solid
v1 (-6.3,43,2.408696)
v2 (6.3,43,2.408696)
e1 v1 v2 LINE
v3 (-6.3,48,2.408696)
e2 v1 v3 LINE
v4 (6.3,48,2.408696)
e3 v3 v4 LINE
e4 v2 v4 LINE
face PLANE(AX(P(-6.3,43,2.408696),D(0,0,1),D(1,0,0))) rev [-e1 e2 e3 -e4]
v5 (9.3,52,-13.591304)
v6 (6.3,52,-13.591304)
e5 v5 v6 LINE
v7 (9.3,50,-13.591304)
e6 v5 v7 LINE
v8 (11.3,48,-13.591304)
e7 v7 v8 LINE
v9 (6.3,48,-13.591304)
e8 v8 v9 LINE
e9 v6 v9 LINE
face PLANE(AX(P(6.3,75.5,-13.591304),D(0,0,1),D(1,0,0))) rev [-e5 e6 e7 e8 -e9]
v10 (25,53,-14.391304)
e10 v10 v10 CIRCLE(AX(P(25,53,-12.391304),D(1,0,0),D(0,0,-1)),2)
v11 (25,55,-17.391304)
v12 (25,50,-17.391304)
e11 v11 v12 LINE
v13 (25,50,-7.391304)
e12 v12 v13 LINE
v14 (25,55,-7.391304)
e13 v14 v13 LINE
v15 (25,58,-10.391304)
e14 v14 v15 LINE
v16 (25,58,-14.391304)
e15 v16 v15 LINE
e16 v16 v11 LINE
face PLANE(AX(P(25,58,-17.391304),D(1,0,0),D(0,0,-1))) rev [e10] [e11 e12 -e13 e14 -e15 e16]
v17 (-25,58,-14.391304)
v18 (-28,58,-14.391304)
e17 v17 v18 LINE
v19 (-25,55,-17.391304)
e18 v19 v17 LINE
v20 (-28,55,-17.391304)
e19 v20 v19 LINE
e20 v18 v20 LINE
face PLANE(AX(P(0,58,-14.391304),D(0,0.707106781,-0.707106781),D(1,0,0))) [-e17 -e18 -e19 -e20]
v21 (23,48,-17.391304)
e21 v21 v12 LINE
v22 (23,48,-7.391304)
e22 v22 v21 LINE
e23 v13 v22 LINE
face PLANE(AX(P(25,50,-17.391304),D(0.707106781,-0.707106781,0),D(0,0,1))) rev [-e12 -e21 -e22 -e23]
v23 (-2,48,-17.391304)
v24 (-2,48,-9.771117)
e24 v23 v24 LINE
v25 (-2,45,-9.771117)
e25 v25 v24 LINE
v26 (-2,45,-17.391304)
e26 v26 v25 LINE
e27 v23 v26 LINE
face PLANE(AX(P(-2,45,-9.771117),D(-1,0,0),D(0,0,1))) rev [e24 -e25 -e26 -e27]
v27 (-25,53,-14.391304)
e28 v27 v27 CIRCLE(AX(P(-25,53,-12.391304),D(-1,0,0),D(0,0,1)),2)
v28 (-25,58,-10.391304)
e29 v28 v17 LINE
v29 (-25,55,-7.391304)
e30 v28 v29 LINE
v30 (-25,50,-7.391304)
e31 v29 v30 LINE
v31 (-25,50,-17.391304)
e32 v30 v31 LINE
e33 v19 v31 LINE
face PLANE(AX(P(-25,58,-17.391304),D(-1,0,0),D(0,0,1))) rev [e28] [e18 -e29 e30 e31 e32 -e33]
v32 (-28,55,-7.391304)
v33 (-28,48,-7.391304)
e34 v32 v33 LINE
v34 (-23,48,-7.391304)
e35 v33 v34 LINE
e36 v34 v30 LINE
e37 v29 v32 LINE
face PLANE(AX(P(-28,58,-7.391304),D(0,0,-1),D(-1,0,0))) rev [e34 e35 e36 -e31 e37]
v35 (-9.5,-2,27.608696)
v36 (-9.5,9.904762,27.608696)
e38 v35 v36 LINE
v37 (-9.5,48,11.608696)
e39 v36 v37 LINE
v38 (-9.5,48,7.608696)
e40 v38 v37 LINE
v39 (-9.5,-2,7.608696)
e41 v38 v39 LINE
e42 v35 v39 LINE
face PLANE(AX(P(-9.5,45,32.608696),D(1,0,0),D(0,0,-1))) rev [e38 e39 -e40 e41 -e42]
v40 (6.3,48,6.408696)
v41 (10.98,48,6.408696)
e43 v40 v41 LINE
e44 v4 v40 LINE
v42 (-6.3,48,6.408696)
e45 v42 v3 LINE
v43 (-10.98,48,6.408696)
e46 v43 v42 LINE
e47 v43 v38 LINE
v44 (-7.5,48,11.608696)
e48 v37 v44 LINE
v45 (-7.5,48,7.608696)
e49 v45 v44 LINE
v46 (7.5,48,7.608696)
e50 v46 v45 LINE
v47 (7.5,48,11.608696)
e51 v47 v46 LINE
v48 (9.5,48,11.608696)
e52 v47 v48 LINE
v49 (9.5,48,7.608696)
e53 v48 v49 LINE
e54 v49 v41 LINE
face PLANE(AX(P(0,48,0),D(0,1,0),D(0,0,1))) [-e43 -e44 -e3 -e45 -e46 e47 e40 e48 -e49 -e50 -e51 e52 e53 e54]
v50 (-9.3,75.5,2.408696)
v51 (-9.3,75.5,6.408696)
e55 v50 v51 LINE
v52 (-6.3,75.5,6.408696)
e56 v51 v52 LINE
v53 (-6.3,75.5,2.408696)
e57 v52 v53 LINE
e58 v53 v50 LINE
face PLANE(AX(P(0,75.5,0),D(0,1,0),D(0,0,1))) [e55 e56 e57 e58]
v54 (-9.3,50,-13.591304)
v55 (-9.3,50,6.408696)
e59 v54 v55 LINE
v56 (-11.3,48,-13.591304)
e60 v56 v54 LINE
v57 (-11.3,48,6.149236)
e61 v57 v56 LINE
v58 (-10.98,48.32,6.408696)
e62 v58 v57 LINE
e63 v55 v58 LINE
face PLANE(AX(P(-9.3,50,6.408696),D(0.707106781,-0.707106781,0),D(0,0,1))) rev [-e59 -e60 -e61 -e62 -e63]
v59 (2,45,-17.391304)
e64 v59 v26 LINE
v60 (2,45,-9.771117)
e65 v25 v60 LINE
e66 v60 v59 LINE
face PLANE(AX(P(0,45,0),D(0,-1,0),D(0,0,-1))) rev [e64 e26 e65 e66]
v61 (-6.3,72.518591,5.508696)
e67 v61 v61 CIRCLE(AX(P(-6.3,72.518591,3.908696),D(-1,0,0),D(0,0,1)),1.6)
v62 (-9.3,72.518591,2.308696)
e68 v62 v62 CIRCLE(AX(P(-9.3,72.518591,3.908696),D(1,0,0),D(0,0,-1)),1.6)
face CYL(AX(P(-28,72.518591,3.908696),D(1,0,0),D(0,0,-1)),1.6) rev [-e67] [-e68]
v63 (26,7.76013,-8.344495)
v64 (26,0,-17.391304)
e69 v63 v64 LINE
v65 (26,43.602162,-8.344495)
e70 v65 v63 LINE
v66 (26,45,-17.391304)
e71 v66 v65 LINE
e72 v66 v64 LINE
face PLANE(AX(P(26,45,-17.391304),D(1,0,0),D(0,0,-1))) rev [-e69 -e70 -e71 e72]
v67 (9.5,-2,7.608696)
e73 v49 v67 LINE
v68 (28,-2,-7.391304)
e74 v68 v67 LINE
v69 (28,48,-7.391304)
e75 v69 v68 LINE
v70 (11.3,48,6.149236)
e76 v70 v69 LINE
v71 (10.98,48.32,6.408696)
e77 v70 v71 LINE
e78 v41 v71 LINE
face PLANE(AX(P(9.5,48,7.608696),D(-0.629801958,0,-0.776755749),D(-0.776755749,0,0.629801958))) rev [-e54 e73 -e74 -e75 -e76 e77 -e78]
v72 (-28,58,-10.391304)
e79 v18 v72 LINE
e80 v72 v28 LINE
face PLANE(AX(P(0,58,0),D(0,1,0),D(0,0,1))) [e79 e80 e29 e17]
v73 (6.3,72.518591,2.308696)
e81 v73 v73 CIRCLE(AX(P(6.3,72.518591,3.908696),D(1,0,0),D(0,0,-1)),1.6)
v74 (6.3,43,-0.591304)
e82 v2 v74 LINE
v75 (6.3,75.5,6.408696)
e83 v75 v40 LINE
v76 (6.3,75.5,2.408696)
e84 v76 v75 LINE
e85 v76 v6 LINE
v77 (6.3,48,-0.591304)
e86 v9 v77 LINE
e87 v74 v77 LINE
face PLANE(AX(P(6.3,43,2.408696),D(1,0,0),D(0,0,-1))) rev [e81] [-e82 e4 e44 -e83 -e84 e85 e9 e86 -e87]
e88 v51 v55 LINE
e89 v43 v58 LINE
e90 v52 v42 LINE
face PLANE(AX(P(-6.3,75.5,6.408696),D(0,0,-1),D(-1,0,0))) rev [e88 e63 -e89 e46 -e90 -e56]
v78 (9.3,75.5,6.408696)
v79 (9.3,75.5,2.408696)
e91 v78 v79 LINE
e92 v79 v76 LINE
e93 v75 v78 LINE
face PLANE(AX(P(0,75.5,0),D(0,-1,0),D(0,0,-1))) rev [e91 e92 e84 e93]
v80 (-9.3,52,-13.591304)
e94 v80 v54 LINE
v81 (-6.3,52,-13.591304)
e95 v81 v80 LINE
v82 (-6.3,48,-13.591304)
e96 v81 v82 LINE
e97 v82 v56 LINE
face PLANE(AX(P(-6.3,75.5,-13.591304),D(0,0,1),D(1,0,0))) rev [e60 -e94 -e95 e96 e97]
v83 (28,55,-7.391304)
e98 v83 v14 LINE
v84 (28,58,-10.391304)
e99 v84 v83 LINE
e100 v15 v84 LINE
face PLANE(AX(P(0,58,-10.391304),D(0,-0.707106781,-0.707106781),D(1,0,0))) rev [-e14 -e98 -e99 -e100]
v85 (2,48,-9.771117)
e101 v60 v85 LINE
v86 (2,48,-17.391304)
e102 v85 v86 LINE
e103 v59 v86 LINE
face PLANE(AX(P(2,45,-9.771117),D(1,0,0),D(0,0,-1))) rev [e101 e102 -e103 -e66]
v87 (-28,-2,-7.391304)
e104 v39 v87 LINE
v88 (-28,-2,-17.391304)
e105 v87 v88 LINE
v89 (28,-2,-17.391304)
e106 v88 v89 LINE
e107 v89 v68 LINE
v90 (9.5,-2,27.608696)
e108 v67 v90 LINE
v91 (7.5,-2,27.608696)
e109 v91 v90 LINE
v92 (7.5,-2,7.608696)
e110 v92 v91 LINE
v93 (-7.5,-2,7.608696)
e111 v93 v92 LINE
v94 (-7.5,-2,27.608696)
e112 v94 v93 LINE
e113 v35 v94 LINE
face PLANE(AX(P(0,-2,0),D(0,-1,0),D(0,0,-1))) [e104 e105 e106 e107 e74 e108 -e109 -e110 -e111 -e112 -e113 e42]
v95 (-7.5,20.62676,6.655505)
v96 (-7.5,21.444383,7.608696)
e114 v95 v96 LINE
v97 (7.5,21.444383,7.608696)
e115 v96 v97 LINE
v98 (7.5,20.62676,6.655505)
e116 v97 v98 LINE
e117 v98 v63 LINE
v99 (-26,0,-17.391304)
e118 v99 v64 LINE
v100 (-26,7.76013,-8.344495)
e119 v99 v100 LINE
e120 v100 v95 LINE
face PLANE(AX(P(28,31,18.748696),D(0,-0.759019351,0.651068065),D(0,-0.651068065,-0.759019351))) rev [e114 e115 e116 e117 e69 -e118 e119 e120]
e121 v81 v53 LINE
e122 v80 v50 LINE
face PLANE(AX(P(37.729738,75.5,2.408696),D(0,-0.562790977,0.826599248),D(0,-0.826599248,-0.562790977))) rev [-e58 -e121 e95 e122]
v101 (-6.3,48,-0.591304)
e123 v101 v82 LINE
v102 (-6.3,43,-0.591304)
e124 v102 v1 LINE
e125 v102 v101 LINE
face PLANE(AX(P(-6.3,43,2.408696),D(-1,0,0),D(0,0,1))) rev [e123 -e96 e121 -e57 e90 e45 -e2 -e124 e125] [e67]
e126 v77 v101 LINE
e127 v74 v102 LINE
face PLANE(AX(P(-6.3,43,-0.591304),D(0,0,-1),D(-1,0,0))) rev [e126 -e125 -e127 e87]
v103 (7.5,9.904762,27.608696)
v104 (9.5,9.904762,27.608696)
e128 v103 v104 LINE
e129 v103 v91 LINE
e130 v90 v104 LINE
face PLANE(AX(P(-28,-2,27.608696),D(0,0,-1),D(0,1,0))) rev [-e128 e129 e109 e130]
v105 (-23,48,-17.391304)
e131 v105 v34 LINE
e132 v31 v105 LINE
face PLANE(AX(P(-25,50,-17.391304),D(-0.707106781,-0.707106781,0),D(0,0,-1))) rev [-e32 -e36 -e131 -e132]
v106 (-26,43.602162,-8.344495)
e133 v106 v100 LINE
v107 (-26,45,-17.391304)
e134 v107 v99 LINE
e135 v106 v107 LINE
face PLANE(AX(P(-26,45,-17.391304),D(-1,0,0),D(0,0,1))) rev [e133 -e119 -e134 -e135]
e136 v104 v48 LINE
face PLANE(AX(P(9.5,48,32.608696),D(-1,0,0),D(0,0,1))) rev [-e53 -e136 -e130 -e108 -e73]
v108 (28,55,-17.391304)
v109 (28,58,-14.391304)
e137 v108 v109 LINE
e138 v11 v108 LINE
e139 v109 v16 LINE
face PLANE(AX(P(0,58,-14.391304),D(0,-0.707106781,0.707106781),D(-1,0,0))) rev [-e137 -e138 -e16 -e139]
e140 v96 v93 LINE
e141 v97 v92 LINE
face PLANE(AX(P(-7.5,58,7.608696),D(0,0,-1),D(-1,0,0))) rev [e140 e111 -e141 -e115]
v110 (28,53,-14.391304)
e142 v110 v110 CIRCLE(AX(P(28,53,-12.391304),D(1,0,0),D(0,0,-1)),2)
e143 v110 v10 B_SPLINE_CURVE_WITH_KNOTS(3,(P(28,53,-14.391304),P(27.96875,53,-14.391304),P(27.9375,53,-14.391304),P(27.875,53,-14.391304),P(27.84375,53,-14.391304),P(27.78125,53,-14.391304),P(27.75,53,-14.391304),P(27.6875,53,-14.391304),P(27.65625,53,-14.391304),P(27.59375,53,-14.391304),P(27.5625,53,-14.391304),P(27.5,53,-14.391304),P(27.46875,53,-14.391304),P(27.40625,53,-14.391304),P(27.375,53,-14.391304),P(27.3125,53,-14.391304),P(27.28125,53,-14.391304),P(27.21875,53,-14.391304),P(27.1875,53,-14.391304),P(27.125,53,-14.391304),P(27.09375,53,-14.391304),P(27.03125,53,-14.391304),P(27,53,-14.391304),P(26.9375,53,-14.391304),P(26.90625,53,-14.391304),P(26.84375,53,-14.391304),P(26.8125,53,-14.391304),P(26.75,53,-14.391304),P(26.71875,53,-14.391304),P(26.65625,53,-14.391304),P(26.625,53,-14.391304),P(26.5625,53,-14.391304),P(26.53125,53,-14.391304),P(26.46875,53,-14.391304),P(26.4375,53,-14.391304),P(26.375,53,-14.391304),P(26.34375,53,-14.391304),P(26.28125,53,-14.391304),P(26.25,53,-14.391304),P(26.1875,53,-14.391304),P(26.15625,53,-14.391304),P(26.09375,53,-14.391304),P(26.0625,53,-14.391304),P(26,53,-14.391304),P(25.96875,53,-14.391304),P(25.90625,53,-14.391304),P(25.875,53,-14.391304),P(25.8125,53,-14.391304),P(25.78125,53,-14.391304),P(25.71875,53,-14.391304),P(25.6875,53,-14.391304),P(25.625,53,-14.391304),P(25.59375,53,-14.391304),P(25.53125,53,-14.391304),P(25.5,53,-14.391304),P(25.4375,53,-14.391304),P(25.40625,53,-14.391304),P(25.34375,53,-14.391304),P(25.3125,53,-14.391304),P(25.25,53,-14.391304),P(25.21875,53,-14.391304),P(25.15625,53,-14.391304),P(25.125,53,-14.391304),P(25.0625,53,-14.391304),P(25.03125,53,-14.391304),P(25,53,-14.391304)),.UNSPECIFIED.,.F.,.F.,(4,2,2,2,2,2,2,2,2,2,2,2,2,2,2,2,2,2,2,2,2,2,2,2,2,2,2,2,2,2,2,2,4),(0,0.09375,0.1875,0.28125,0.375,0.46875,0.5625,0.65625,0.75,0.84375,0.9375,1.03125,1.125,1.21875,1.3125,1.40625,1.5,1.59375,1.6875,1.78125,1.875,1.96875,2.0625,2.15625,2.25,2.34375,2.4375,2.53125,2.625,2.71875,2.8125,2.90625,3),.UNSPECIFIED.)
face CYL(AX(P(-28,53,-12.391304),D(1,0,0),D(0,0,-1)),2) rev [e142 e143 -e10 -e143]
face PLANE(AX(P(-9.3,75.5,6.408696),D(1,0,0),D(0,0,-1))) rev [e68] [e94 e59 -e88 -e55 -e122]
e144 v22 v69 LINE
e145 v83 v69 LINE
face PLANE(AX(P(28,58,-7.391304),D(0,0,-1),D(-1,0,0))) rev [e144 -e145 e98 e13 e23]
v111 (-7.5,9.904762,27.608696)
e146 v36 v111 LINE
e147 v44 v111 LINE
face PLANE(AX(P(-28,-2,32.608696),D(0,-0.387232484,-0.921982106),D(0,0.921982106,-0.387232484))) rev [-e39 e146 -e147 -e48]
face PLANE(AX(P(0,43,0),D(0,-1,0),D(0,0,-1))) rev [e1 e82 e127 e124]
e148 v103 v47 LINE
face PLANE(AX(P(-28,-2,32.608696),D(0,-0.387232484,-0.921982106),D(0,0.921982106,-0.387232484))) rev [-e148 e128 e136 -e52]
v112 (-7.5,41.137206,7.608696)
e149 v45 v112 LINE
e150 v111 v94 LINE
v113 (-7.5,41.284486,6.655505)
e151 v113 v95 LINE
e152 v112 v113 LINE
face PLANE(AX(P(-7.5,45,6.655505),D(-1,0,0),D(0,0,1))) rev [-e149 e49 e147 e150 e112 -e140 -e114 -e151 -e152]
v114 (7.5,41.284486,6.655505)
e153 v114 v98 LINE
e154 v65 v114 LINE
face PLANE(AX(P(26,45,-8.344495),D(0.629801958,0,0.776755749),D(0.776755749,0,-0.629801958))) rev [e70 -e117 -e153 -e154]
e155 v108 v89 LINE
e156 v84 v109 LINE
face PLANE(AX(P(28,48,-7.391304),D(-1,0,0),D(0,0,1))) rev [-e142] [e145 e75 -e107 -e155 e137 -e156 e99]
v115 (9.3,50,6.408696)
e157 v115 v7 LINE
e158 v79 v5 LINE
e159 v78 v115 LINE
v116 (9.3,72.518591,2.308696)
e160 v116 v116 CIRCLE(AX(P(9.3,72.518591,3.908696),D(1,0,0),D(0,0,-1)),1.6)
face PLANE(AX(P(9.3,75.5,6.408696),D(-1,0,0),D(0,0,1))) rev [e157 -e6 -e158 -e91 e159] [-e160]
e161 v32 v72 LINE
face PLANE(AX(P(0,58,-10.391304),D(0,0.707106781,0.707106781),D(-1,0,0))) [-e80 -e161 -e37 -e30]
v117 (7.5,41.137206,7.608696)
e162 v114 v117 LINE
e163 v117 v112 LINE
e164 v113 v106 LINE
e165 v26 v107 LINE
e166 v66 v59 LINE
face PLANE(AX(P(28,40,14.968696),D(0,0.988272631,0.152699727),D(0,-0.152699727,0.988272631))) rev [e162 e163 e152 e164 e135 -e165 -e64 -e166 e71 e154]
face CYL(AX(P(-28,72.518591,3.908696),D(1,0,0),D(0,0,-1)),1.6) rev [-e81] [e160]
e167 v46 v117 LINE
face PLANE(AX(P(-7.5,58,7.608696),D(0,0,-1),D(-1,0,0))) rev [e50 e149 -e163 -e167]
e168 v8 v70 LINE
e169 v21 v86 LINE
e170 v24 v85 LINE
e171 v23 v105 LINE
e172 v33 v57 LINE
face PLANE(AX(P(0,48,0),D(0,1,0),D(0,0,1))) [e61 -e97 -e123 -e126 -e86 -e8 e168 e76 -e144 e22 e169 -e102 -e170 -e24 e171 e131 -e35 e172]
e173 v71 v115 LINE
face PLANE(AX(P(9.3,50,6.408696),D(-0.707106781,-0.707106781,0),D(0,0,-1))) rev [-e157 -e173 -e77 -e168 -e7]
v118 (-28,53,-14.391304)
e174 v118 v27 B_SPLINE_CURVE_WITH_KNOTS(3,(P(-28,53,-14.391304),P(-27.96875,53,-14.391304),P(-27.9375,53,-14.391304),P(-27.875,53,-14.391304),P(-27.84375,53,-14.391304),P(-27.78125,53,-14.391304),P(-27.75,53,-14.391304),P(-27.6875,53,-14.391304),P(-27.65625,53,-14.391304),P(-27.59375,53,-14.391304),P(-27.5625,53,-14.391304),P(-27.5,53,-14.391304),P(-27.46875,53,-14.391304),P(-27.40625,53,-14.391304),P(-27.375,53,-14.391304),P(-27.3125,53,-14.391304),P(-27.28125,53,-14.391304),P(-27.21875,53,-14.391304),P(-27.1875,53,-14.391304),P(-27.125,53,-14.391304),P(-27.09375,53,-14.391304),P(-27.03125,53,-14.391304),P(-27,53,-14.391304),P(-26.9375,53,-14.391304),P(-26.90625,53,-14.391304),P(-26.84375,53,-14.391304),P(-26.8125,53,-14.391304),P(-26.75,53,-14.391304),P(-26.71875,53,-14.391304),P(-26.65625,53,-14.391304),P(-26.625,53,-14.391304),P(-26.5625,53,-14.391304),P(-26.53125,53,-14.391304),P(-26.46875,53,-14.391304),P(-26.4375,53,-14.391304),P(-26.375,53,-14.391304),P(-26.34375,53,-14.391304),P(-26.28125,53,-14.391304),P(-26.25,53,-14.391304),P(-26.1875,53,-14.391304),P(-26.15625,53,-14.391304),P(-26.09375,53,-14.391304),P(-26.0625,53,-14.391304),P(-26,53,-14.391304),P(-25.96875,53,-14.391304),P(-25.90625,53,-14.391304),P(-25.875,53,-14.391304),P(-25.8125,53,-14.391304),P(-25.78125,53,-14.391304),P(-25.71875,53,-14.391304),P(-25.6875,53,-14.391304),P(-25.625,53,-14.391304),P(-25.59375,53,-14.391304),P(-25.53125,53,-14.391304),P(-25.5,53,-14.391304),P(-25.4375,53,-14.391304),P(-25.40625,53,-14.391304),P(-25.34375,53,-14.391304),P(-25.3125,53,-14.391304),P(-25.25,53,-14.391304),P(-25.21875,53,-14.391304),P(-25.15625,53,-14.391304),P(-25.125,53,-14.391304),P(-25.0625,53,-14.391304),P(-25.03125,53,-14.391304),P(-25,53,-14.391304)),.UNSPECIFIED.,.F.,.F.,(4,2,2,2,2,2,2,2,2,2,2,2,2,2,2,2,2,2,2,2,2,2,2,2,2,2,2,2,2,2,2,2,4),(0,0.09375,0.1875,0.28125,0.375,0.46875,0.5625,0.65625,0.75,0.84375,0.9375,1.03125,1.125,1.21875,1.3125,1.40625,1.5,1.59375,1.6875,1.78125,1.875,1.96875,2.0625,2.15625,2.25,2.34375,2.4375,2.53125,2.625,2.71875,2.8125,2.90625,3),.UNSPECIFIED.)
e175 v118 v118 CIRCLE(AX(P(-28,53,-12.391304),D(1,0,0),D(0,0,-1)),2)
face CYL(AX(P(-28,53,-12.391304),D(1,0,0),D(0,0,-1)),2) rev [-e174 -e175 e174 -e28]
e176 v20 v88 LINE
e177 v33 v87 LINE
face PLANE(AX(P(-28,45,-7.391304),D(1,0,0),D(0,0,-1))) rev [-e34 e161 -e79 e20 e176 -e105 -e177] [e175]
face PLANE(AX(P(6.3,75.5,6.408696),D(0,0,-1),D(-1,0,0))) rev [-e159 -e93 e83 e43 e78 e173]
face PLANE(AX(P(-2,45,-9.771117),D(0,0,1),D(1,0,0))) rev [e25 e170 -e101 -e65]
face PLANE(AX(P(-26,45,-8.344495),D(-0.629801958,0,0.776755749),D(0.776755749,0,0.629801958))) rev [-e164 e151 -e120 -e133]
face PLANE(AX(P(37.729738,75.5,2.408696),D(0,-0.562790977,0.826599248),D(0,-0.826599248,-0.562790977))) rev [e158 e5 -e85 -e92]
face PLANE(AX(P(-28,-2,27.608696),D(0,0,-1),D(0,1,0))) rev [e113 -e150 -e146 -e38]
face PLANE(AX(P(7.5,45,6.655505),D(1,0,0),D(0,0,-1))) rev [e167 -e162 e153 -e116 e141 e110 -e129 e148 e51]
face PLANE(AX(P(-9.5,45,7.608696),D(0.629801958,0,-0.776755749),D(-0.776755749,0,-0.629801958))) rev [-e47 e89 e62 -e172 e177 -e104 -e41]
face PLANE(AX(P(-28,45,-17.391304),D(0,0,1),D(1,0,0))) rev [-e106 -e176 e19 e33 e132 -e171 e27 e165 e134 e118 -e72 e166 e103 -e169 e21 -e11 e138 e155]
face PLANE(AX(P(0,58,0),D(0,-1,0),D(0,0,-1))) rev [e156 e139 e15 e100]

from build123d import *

# Parameters (mm, degrees)
SALIENTE_EXTRUIR1_DEPTH   = 45
SALIENTE_EXTRUIR1_2_DEPTH = 45
SALIENTE_EXTRUIR2_DEPTH   = 3
SALIENTE_EXTRUIR3_START   = -45
SALIENTE_EXTRUIR3_DEPTH   = 2
CROQUIS4_W                = 3
CROQUIS4_H                = 10
SALIENTE_EXTRUIR4_DEPTH   = 10
CROQUIS5_R                = 2
CORTAR_EXTRUIR1_DEPTH     = 87.967390625
CHAFL_N1_SIZE             = 3
CORTAR_EXTRUIR3_DEPTH     = 77.377856949
SALIENTE_EXTRUIR7_DEPTH   = 54
CROQUIS6_W                = 15
CROQUIS6_H                = 20
CORTAR_EXTRUIR5_DEPTH     = 74.806009458
CORTAR_EXTRUIR6_DEPTH     = 74.806009458
CORTAR_EXTRUIR7_DEPTH     = 77.377856949
CROQUIS16_W               = 12.6
CROQUIS16_H               = 3
CORTAR_EXTRUIR8_DEPTH     = 5
CROQUIS18_W               = 3
CROQUIS18_H               = 20
SALIENTE_EXTRUIR8_DEPTH   = 27.5
CORTAR_EXTRUIR9_REACH     = 90.622
CROQUIS21_W               = 4
CROQUIS21_H               = 10
CORTAR_EXTRUIR10_DEPTH    = 3
CROQUIS22_R               = 1.6
CORTAR_EXTRUIR11_DEPTH    = 89.621555367
CHAFL_N2_SIZE             = 2


with BuildPart() as part:
    # Croquis1 → Saliente-Extruir1 (new body)
    with BuildSketch(Plane(origin=(0, 0, 0), x_dir=(1, 0, 0), z_dir=(0, 1, 0))):
        Polygon((-26, 17.391304348), (-26, 8.344494697), (-7.5, -6.655505303), (-7.5, -32.608695652), (-9.5, -32.608695652), (-9.5, -7.608695652), (-28, 7.391304348), (-28, 17.391304348), align=None)
    extrude(amount=SALIENTE_EXTRUIR1_DEPTH)



with BuildPart() as body_2:
    # Croquis1 → Saliente-Extruir1 2 (new body)
    with BuildSketch(Plane(origin=(0, 0, 0), x_dir=(1, 0, 0), z_dir=(0, 1, 0))):
        Polygon((7.5, -6.655505303), (7.5, -32.608695652), (9.5, -32.608695652), (9.5, -7.608695652), (28, 7.391304348), (28, 17.391304348), (26, 17.391304348), (26, 8.344494697), align=None)
    extrude(amount=SALIENTE_EXTRUIR1_2_DEPTH)


with BuildPart() as part_1:
    add(part.part)

    add(body_2.part)  # Saliente-Extruir2 merges body 2
    # Croquis2 → Saliente-Extruir2 (add)
    with BuildSketch(Plane(origin=(0, 45, 0), x_dir=(1, 0, 0), z_dir=(0, 1, 0))):
        Polygon((-9.5, -32.608695652), (9.5, -32.608695652), (9.5, -7.608695652), (28, 7.391304348), (28, 17.391304348), (-28, 17.391304348), (-28, 7.391304348), (-9.5, -7.608695652), align=None)
    extrude(amount=SALIENTE_EXTRUIR2_DEPTH)

    # Croquis2<2> → Saliente-Extruir3 (add)
    with BuildSketch(Plane(origin=(0, 45, 0), x_dir=(1, 0, 0), z_dir=(0, 1, 0)).offset(SALIENTE_EXTRUIR3_START)):
        Polygon((-9.5, -32.608695652), (9.5, -32.608695652), (9.5, -7.608695652), (28, 7.391304348), (28, 17.391304348), (-28, 17.391304348), (-28, 7.391304348), (-9.5, -7.608695652), align=None)
    extrude(amount=-SALIENTE_EXTRUIR3_DEPTH)

    # Croquis4 → Saliente-Extruir4 (add)
    with BuildSketch(Plane(origin=(0, 48, 0), x_dir=(1, 0, 0), z_dir=(0, 1, 0))):
        with Locations((-26.5, 12.391304348)):
            Rectangle(CROQUIS4_W, CROQUIS4_H)
        with Locations((26.5, 12.391304348)):
            Rectangle(CROQUIS4_W, CROQUIS4_H)
    extrude(amount=SALIENTE_EXTRUIR4_DEPTH)

    # Croquis5 → Cortar-Extruir1 (cut, through all)
    with BuildSketch(Plane(origin=(28, 0, 0), x_dir=(0, 0, -1), z_dir=(1, 0, 0))):
        with Locations((12.391304348, 53)):
            Circle(CROQUIS5_R)
    extrude(amount=-CORTAR_EXTRUIR1_DEPTH, mode=Mode.SUBTRACT)

    # Chaflán1
    chafl_n1_edges = [part_1.edges().sort_by_distance(p)[0] for p in [
        (-26.5, 58, -7.391304348),
        (-26.5, 58, -17.391304348),
        (26.5, 58, -17.391304348),
        (26.5, 58, -7.391304348),
    ]]
    chamfer(chafl_n1_edges, length=CHAFL_N1_SIZE)

    # Croquis7 → Cortar-Extruir3 (cut, through all)
    with BuildSketch(Plane(origin=(9.5, 0, 0), x_dir=(0, 0, -1), z_dir=(1, 0, 0))):
        Polygon((-32.608695652, -2), (-11.608695652, 48), (-32.608695652, 48), align=None)
    extrude(amount=-CORTAR_EXTRUIR3_DEPTH, mode=Mode.SUBTRACT)

    # Croquis13 → Saliente-Extruir7 (add)
    with BuildSketch(Plane(origin=(-26, 0, 0), x_dir=(0, 0, -1), z_dir=(1, 0, 0))):
        Polygon((17.391304348, 45), (-12.868695652, 45), (-14.968695652, 40), align=None)
        Polygon((17.391304348, 0), (-31.768695652, 0), (-18.748695652, 31), align=None)
    extrude(amount=SALIENTE_EXTRUIR7_DEPTH)

    # Croquis6 → Cortar-Extruir5 (cut, through all)
    with BuildSketch(Plane.XZ.offset(2)):
        with Locations((0, 17.608695652)):
            Rectangle(CROQUIS6_W, CROQUIS6_H)
    extrude(amount=-CORTAR_EXTRUIR5_DEPTH, mode=Mode.SUBTRACT)

    # Croquis14 → Cortar-Extruir6 (cut, through all)
    with BuildSketch(Plane.XZ.offset(2)):
        Polygon((-28, -7.391304348), (-9.5, 7.608695652), (-9.5, 32.608695652), (-28, 32.608695652), align=None)
        Polygon((28, -7.391304348), (9.5, 7.608695652), (9.5, 32.608695652), (28, 32.608695652), align=None)
    extrude(amount=-CORTAR_EXTRUIR6_DEPTH, mode=Mode.SUBTRACT)

    # Croquis15 → Cortar-Extruir7 (cut, through all)
    with BuildSketch(Plane(origin=(9.5, 0, 0), x_dir=(0, 0, -1), z_dir=(1, 0, 0))):
        Polygon((-27.608695652, -2), (-27.608695652, 9.904761905), (-32.608695652, -2), align=None)
    extrude(amount=-CORTAR_EXTRUIR7_DEPTH, mode=Mode.SUBTRACT)

    # Croquis16 → Cortar-Extruir8 (cut)
    with BuildSketch(Plane(origin=(0, 48, 0), x_dir=(1, 0, 0), z_dir=(0, 1, 0))):
        with Locations((0, -0.908695652)):
            Rectangle(CROQUIS16_W, CROQUIS16_H)
    extrude(amount=-CORTAR_EXTRUIR8_DEPTH, mode=Mode.SUBTRACT)

    # Croquis18 → Saliente-Extruir8 (add)
    with BuildSketch(Plane(origin=(0, 48, 0), x_dir=(1, 0, 0), z_dir=(0, 1, 0))):
        with Locations((-7.8, 3.591304348)):
            Rectangle(CROQUIS18_W, CROQUIS18_H)
        with Locations((7.8, 3.591304348)):
            Rectangle(CROQUIS18_W, CROQUIS18_H)
    extrude(amount=SALIENTE_EXTRUIR8_DEPTH)

    # Cortar-Extruir9: up to this face of the body (flat: up to its plane)
    cortar_extruir9_end = Plane(part_1.part.faces().sort_by_distance((9.3, 61.75, -3.591304348))[0])
    # Croquis20 → Cortar-Extruir9 (cut, up to the picked face)
    with BuildSketch(Plane.ZY.offset(9.3), mode=Mode.PRIVATE) as cortar_extruir9_sk1:
        Polygon((2.408695652, 75.5), (-13.591304348, 52), (-13.591304348, 75.5), align=None)
    cortar_extruir9_tool1 = split(extrude(cortar_extruir9_sk1.sketch, amount=-CORTAR_EXTRUIR9_REACH, mode=Mode.PRIVATE), bisect_by=cortar_extruir9_end, keep=Keep.BOTH, mode=Mode.PRIVATE)
    add(cortar_extruir9_tool1.solids().sort_by(Axis((-9.3, 67.666667, -8.257971), (1, 0, 0)))[0], mode=Mode.SUBTRACT)

    # Croquis21 → Cortar-Extruir10 (cut)
    with BuildSketch(Plane(origin=(0, 48, 0), x_dir=(1, 0, 0), z_dir=(0, 1, 0))):
        with Locations((0, 14.771116856)):
            Rectangle(CROQUIS21_W, CROQUIS21_H)
    extrude(amount=-CORTAR_EXTRUIR10_DEPTH, mode=Mode.SUBTRACT)

    # Croquis22 → Cortar-Extruir11 (cut, through all)
    with BuildSketch(Plane(origin=(9.3, 0, 0), x_dir=(0, 0, -1), z_dir=(1, 0, 0))):
        with Locations((-3.908695652, 72.518591358)):
            Circle(CROQUIS22_R)
    extrude(amount=-CORTAR_EXTRUIR11_DEPTH, mode=Mode.SUBTRACT)

    # Chaflán2
    # the kernel refuses this chamfer: 2 mm, written as the material it adds along each edge
    with BuildSketch(Plane(origin=(-25, 48, -17.391304348), x_dir=(0.9996219169112968, -0.027495876610585647, 0), z_dir=(0, 0, 1)), Plane(origin=(25, 48, -17.391304348), x_dir=(0.027495876610585647, 0.9996219169112968, 0), z_dir=(0, 0, 1))) as chafl_n2_piece_1:
        Polygon((CHAFL_N2_SIZE * 0.999621916911, CHAFL_N2_SIZE * 0.0274958766106), (-CHAFL_N2_SIZE * 0.0274958766106, CHAFL_N2_SIZE * 0.999621916911), (0, 0), align=None)
    extrude(amount=10)
    with BuildSketch(Plane(origin=(-9.3, 48, 6.408695652), x_dir=(-0.9996219169112968, -0.027495876610585623, 0), z_dir=(0, 0, -1))) as chafl_n2_piece_2_section:
        Polygon((CHAFL_N2_SIZE * 0.999621916911, CHAFL_N2_SIZE * 0.0274958766106), (-CHAFL_N2_SIZE * 0.0274958766106, CHAFL_N2_SIZE * 0.999621916911), (0, 0), align=None)
    chafl_n2_piece_2 = extrude(amount=20, mode=Mode.PRIVATE)
    chafl_n2_piece_2 = split(chafl_n2_piece_2, bisect_by=Plane(origin=(-15.34165394, 48.600071078, 2.872219484), z_dir=(0.6298019584212193, 0, -0.7767557487195037)), keep=Keep.TOP, mode=Mode.PRIVATE)
    add(chafl_n2_piece_2)
    with BuildSketch(Plane(origin=(9.3, 48, 6.408695652), x_dir=(0.9996219169112968, -0.027495876610585623, 0), z_dir=(0, 0, -1))) as chafl_n2_piece_3_section:
        Polygon((CHAFL_N2_SIZE * 0.999621916911, -CHAFL_N2_SIZE * 0.0274958766106), (-CHAFL_N2_SIZE * 0.0274958766106, -CHAFL_N2_SIZE * 0.999621916911), (0, 0), align=None)
    chafl_n2_piece_3 = extrude(amount=20, mode=Mode.PRIVATE)
    chafl_n2_piece_3 = split(chafl_n2_piece_3, bisect_by=Plane(origin=(15.34165394, 48.600071078, 2.872219484), z_dir=(-0.6298019584212193, 0, -0.7767557487195037)), keep=Keep.TOP, mode=Mode.PRIVATE)
    add(chafl_n2_piece_3)


solid = part_1.part
